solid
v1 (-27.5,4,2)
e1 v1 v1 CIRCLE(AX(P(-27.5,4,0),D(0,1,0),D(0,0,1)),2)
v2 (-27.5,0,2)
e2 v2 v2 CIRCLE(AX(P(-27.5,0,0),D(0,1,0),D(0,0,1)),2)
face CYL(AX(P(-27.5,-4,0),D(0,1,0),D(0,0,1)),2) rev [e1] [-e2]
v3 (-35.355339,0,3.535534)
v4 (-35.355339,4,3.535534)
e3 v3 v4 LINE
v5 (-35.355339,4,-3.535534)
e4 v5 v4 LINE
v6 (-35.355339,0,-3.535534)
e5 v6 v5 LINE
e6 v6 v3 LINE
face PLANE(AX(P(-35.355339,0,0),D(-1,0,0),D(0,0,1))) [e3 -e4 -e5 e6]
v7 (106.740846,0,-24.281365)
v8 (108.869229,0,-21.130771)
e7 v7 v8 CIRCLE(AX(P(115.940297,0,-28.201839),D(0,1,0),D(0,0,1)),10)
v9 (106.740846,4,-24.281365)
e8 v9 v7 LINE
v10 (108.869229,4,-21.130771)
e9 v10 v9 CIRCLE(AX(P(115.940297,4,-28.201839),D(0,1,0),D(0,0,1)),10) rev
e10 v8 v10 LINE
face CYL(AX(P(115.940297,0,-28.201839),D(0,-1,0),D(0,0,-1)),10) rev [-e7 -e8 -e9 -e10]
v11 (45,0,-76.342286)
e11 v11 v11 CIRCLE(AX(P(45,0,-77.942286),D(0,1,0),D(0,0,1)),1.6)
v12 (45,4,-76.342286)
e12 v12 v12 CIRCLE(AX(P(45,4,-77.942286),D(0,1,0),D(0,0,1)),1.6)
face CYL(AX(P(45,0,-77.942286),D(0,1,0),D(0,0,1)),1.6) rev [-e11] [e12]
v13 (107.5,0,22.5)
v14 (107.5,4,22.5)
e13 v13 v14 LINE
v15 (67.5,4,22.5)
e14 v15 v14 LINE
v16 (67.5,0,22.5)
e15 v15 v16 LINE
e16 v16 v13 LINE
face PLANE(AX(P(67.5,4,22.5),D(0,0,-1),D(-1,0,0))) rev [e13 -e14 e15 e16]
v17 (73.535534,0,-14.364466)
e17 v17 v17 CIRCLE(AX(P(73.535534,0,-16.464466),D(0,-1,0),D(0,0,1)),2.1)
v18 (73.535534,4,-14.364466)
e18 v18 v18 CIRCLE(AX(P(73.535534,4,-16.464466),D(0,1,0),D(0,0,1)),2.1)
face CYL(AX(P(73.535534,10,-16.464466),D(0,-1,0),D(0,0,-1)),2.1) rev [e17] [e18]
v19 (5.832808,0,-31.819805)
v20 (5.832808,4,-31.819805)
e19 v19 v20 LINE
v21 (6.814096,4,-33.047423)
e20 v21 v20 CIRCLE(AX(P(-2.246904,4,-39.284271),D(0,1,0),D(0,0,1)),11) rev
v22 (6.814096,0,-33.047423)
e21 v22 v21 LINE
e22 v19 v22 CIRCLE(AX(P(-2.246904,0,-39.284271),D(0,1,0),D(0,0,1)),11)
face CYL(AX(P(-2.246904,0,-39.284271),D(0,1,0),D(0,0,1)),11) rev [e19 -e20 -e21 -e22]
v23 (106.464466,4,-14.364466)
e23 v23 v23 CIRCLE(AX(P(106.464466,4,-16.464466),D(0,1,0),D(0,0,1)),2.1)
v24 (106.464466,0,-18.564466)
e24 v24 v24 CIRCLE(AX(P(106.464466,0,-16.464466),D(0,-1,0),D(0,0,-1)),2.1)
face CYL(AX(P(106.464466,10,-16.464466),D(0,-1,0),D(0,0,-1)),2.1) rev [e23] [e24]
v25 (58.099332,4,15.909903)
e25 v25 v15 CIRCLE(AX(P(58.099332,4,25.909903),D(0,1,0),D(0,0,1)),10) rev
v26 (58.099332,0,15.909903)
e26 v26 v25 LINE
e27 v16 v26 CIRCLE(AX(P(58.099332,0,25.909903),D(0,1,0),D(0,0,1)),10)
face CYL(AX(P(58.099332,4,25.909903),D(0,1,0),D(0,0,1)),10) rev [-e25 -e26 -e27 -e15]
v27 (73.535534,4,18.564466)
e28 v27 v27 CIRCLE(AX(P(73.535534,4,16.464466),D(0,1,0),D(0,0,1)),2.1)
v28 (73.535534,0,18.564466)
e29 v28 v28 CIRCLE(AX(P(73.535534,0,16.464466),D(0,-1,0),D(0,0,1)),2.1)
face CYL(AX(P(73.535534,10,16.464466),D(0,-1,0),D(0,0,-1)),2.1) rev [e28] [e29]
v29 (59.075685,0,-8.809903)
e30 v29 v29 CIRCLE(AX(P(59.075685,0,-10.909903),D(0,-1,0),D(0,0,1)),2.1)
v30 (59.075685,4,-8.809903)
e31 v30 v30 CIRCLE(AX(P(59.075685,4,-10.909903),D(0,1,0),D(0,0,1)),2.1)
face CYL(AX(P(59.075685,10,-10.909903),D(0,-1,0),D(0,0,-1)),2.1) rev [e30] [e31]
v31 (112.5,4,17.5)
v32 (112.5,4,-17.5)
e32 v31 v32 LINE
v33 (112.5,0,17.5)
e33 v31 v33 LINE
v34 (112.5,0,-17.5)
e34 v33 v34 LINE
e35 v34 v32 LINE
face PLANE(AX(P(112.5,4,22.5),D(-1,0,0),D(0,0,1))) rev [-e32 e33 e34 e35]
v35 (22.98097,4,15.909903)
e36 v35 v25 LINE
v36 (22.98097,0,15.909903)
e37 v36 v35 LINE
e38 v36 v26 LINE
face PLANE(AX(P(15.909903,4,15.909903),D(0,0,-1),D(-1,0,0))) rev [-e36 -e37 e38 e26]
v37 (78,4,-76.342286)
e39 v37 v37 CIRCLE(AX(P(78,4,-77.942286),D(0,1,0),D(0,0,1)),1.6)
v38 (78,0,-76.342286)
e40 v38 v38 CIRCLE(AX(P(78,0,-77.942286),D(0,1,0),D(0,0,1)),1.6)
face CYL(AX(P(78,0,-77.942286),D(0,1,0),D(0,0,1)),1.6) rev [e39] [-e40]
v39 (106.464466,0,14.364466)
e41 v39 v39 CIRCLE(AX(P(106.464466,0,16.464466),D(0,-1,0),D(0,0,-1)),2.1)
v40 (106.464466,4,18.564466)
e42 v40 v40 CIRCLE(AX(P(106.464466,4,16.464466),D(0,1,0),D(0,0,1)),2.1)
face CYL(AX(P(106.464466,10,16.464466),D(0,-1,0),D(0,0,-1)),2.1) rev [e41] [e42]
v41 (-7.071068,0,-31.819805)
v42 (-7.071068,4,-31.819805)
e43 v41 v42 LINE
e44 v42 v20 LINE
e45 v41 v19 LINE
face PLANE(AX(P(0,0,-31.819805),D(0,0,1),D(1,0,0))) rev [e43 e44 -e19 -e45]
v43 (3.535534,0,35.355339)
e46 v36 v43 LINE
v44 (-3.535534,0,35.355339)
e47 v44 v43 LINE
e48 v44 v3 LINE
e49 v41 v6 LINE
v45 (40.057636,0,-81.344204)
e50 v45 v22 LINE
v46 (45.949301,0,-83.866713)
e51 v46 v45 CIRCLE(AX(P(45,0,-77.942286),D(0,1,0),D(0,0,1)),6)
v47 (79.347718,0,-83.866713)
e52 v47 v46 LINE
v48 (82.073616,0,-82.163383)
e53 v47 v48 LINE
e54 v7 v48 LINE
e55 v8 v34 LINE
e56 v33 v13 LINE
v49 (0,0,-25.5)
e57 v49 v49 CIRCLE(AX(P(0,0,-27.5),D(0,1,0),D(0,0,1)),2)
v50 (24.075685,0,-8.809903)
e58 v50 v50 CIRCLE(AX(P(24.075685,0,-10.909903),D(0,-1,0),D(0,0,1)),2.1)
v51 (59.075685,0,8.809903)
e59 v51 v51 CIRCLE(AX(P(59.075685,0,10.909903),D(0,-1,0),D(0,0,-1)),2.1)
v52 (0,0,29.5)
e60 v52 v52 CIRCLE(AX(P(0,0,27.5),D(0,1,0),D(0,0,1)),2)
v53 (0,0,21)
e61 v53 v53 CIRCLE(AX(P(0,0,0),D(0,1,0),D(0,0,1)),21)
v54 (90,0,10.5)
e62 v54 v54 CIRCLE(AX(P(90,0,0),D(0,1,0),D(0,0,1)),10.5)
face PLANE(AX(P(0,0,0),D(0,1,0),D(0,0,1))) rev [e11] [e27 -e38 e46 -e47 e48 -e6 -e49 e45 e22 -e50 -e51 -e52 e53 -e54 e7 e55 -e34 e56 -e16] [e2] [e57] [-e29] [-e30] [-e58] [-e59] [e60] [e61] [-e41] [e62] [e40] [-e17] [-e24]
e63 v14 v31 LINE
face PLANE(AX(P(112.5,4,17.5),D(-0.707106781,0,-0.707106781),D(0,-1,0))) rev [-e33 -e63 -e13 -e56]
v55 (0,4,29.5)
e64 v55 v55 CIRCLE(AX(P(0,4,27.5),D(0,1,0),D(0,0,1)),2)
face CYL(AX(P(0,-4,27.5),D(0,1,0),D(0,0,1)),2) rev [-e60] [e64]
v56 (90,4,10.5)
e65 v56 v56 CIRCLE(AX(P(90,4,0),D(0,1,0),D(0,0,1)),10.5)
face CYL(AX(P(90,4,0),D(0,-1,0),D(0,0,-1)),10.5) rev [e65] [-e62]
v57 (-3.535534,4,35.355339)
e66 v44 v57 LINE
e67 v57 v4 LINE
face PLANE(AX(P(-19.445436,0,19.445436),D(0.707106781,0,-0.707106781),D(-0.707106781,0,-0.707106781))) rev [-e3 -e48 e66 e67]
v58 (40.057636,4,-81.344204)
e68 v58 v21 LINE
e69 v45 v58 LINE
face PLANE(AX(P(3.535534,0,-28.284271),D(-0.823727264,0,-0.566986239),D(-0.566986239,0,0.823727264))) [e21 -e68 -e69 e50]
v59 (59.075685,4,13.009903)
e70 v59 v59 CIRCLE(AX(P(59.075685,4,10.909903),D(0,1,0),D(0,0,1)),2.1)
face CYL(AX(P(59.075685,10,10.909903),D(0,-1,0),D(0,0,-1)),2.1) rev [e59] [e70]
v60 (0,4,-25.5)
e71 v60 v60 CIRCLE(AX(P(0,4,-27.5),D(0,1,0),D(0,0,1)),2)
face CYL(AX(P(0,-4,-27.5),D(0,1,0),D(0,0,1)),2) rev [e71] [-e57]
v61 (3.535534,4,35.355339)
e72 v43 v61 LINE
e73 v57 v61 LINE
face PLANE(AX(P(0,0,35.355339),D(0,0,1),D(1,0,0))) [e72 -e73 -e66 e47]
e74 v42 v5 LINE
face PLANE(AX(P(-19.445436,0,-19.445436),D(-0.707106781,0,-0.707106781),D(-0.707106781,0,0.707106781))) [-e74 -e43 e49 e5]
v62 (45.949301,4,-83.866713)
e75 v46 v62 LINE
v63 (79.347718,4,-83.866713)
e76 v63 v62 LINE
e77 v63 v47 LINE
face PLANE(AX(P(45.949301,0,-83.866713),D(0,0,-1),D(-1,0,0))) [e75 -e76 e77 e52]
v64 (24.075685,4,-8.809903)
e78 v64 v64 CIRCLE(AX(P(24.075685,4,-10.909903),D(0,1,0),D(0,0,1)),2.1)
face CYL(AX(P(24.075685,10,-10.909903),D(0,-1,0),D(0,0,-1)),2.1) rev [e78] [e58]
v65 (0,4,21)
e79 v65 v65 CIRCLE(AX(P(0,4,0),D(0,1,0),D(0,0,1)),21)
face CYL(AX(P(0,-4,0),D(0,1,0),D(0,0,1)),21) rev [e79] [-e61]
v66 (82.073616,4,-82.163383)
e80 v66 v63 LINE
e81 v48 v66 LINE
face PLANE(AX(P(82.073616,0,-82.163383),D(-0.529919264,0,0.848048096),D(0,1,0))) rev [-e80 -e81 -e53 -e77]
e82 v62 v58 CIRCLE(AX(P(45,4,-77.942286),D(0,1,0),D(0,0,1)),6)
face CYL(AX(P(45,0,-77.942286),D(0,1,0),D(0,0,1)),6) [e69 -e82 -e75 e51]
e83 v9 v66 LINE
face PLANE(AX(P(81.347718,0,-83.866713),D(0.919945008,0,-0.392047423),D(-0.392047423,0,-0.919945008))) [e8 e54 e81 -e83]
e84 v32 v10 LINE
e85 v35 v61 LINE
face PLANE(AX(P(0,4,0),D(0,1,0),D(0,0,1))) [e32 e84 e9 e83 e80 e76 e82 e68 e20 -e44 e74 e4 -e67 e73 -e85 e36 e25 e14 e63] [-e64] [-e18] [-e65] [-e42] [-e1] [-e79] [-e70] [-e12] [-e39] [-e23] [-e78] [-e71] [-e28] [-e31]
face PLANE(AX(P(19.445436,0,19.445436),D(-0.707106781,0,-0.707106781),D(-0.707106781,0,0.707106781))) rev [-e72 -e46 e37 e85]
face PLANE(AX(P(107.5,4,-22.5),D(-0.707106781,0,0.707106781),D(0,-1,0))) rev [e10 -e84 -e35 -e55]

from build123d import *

# Parameters (mm, degrees)
SKETCH_1_R          = 2.1
SKETCH_1_R_2        = 10.5
SKETCH_1_R_3        = 10
EXTRUDE_1_DEPTH     = 4
CHAMFER_1_SIZE      = 5
FILLET_1_R          = 10
SKETCH_2_R          = 2.1
CUT_EXTRUDE_1_DEPTH = 10
EXTRUDE_START       = -4
SKETCH_3_R          = 1.6
EXTRUDE_2_DEPTH     = 4
FILLET_2_R          = 3
FILLET_3_R          = 11
SKETCH_4_R          = 1.6
EXTRUDE_3_DEPTH     = 4
FILLET_4_R          = 10
CHAMFER_2_SIZE      = 2
CHAMFER_2_SIZE2     = 1.851556395
FILLET_5_R          = 10
SKETCH_5_R          = 17.5
CUT_EXTRUDE_2_DEPTH = 10
SKETCH_7_R          = 2.1
EXTRUDE_9_DEPTH     = 4
EXTRUDE_10_DEPTH    = 8
EXTRUDE_11_DEPTH    = 4


with BuildPart() as part:
    # 草图1 → 凸台-拉伸1 (new body)
    with BuildSketch(Plane(origin=(0, 0, 0), x_dir=(1, 0, 0), z_dir=(0, 1, 0))):
        Polygon((0, 31.819805153), (-31.819805153, 0), (0, -31.819805153), (15.909902577, -15.909902577), (67.5, -15.909902577), (67.5, -22.5), (112.5, -22.5), (112.5, 22.5), (67.5, 22.5), (67.5, 15.909902577), (15.909902577, 15.909902577), align=None)
        with Locations(Location((0, 14, 0), (0, 0, 270))):
            Circle(SKETCH_1_R, mode=Mode.SUBTRACT)
        with Locations(Location((14, 0, 0), (0, 0, 270))):
            Circle(SKETCH_1_R, mode=Mode.SUBTRACT)
        with Locations(Location((0, -14, 0), (0, 0, 270))):
            Circle(SKETCH_1_R, mode=Mode.SUBTRACT)
        with Locations(Location((-14, 0, 0), (0, 0, 270))):
            Circle(SKETCH_1_R, mode=Mode.SUBTRACT)
        with Locations(Location((90, 0, 0), (0, 0, 270))):
            Circle(SKETCH_1_R_2, mode=Mode.SUBTRACT)
        with Locations(Location((0, 22.5, 0), (0, 0, 270))):
            Circle(SKETCH_1_R, mode=Mode.SUBTRACT)
        with Locations(Location((0, -22.5, 0), (0, 0, 270))):
            Circle(SKETCH_1_R, mode=Mode.SUBTRACT)
        with Locations(Location((0, 0, 0), (0, 0, 270))):
            Circle(SKETCH_1_R_3, mode=Mode.SUBTRACT)
        with Locations(Location((-22.5, 0, 0), (0, 0, 270))):
            Circle(SKETCH_1_R, mode=Mode.SUBTRACT)
    extrude(amount=EXTRUDE_1_DEPTH)

    # 倒角1
    chamfer_1_edges = [part.edges().sort_by_distance(p)[0] for p in [
        (112.5, 2, -22.5),
        (112.5, 2, 22.5),
        (0, 2, 31.819805153),
        (-31.819805153, 2, 0),
        (0, 2, -31.819805153),
    ]]
    chamfer(chamfer_1_edges, length=CHAMFER_1_SIZE)

    # 圆角1
    # the kernel refuses this fillet: 10 mm, written as the material it adds along each edge
    with BuildSketch(Plane(origin=(15.909902577, 0, -15.909902577), x_dir=(-0.707106781186552, 0, -0.707106781186543), z_dir=(0, 1, 0))) as fillet_1_piece_1:
        with BuildLine():
            CenterArc((FILLET_1_R * 0.414213562373, -FILLET_1_R), FILLET_1_R, 90, 45)
            Line((-FILLET_1_R * 0.292893218813, -FILLET_1_R * 0.292893218813), (-FILLET_1_R * 0.307035354437, -FILLET_1_R * 0.27875108319))
            Line((-FILLET_1_R * 0.307035354437, -FILLET_1_R * 0.27875108319), (-FILLET_1_R * 0.00828427124746, FILLET_1_R * 0.02))
            Line((-FILLET_1_R * 0.00828427124746, FILLET_1_R * 0.02), (FILLET_1_R * 0.414213562373, FILLET_1_R * 0.02))
            Line((FILLET_1_R * 0.414213562373, FILLET_1_R * 0.02), (FILLET_1_R * 0.414213562373, 0))
        make_face()
    extrude(amount=4)
    with BuildSketch(Plane(origin=(15.909902577, 0, 15.909902577), x_dir=(-0.7071067811865422, 0, 0.707106781186553), z_dir=(0, 1, 0))) as fillet_1_piece_2:
        with BuildLine():
            CenterArc((FILLET_1_R * 0.414213562373, FILLET_1_R), FILLET_1_R, 225, 45)
            Line((-FILLET_1_R * 0.292893218813, FILLET_1_R * 0.292893218813), (-FILLET_1_R * 0.307035354437, FILLET_1_R * 0.27875108319))
            Line((-FILLET_1_R * 0.307035354437, FILLET_1_R * 0.27875108319), (-FILLET_1_R * 0.00828427124746, -FILLET_1_R * 0.02))
            Line((-FILLET_1_R * 0.00828427124746, -FILLET_1_R * 0.02), (FILLET_1_R * 0.414213562373, -FILLET_1_R * 0.02))
            Line((FILLET_1_R * 0.414213562373, -FILLET_1_R * 0.02), (FILLET_1_R * 0.414213562373, 0))
        make_face()
    extrude(amount=4)
    with BuildSketch(Plane(origin=(67.5, 0, 15.909902577), x_dir=(-1, 0, 0), z_dir=(0, 1, 0))) as fillet_1_piece_3:
        with BuildLine():
            CenterArc((9.400668296, 10), FILLET_1_R, 199.937217397, 70.062782603)
            Line((0, 6.590097423), (-0.188013366, 6.521899372))
            ThreePointArc((-0.188013366, 6.521899372), (-0.2, 3.295048712), (-0.2, 0))
            Line((-0.2, 0), (0, -0.2))
            Line((0, -0.2), (9.400668296, -0.2))
            Line((9.400668296, -0.2), (9.400668296, 0))
        make_face()
    extrude(amount=4)
    with BuildSketch(Plane(origin=(67.5, 0, -15.909902577), x_dir=(-1, 0, 0), z_dir=(0, 1, 0))) as fillet_1_piece_4:
        with BuildLine():
            CenterArc((9.400668296, -10), FILLET_1_R, 90, 70.062782603)
            Line((0, -6.590097423), (-0.188013366, -6.521899372))
            ThreePointArc((-0.188013366, -6.521899372), (-0.2, -3.295048712), (-0.2, 0))
            Line((-0.2, 0), (0, 0.2))
            Line((0, 0.2), (9.400668296, 0.2))
            Line((9.400668296, 0.2), (9.400668296, 0))
        make_face()
    extrude(amount=4)

    # 草图2 → 切除-拉伸1 (cut)
    with BuildSketch(Plane.XZ):
        with Locations(Location((106.464466094, 16.464466094, 0), (0, 0, 270))):
            Circle(SKETCH_2_R)
        with Locations(Location((106.464466094, -16.464466094, 0), (0, 0, 270))):
            Circle(SKETCH_2_R)
        with Locations(Location((73.535533906, -16.464466094, 0), (0, 0, 90))):
            Circle(SKETCH_2_R)
        with Locations(Location((73.535533906, 16.464466094, 0), (0, 0, 90))):
            Circle(SKETCH_2_R)
        with Locations(Location((24.075684952, 10.909902577, 0), (0, 0, 270))):
            Circle(SKETCH_2_R)
        with Locations(Location((59.075684952, 10.909902577, 0), (0, 0, 270))):
            Circle(SKETCH_2_R)
        with Locations(Location((59.075684952, -10.909902577, 0), (0, 0, 90))):
            Circle(SKETCH_2_R)
        with Locations(Location((24.075684952, -10.909902577, 0), (0, 0, 90))):
            Circle(SKETCH_2_R)
    extrude(amount=-CUT_EXTRUDE_1_DEPTH, mode=Mode.SUBTRACT)

    # 草图3 → 凸台-拉伸2 (add)
    with BuildSketch(Plane(origin=(0, 4, 0), x_dir=(1, 0, 0), z_dir=(0, 1, 0)).offset(EXTRUDE_START)):
        with BuildLine():
            Line((3.535533906, 28.284271247), (40.057636417, 81.344203773))
            ThreePointArc((40.057636417, 81.344203773), (45.94930127, 83.86671265), (50.75784592, 79.629654221))
            Line((50.75784592, 79.629654221), (67.5, 22.5))
            ThreePointArc((67.5, 22.5), (63.839583189, 17.721525883), (58.099331704, 15.909902577))
            Line((58.099331704, 15.909902577), (20.0520382, 15.909902577))
            ThreePointArc((20.0520382, 15.909902577), (16.225203877, 16.671107252), (12.980970389, 18.838834765))
            Line((12.980970389, 18.838834765), (3.535533906, 28.284271247))
        make_face()
        with Locations(Location((45, 77.942286341, 0), (0, 0, 270))):
            Circle(SKETCH_3_R, mode=Mode.SUBTRACT)
        Polygon((16.491758356, 29.470182421), (43.526560522, 68.746803428), (56.080145943, 25.909902577), (20.0520382, 25.909902577), align=None, mode=Mode.SUBTRACT)
    extrude(amount=EXTRUDE_2_DEPTH)

    # 圆角2
    fillet_2_edges = [part.edges().sort_by_distance(p)[0] for p in [
        (16.491758356, 2, -29.470182421),
        (43.526560522, 2, -68.746803428),
        (56.080145943, 2, -25.909902577),
        (20.0520382, 2, -25.909902577),
    ]]
    fillet(fillet_2_edges, radius=FILLET_2_R)

    # 圆角3
    fillet_3_edges = [part.edges().sort_by_distance(p)[0] for p in [
        (67.5, 2, -22.5),
        (3.535533906, 2, -28.284271247),
    ]]
    fillet(fillet_3_edges, radius=FILLET_3_R)

    # 草图4 → 凸台-拉伸3 (add)
    with BuildSketch(Plane(origin=(0, 4, 0), x_dir=(1, 0, 0), z_dir=(0, 1, 0)).offset(EXTRUDE_START)):
        with BuildLine():
            Line((45.94930127, 83.86671265), (81.347717681, 83.86671265))
            Line((81.347717681, 83.86671265), (107.5, 22.5))
            Line((107.5, 22.5), (97.716806526, 22.5))
            Line((97.716806526, 22.5), (75.4, 74.86671265))
            Line((75.4, 74.86671265), (52.153651701, 74.86671265))
            Line((52.153651701, 74.86671265), (50.75784592, 79.629654221))
            ThreePointArc((50.75784592, 79.629654221), (48.966689034, 82.443994695), (45.94930127, 83.86671265))
        make_face()
        with Locations(Location((78, 77.942286341, 0), (0, 0, 270))):
            Circle(SKETCH_4_R, mode=Mode.SUBTRACT)
    extrude(amount=EXTRUDE_3_DEPTH)

    # 圆角4
    fillet_4_edges = [part.edges().sort_by_distance(p)[0] for p in [
        (97.716806526, 2, -22.5),
        (75.4, 2, -74.86671265),
        (52.153651701, 2, -74.86671265),
    ]]
    fillet(fillet_4_edges, radius=FILLET_4_R)

    # 倒角2
    chamfer_2_edges = [part.edges().sort_by_distance(p)[0] for p in [
        (81.347717681, 2, -83.86671265),
    ]]
    chamfer_2_side = [part.faces().sort_by_distance(p)[0] for p in [
        (63.648509476, 2, -83.86671265),
    ]]
    chamfer(chamfer_2_edges, length=CHAMFER_2_SIZE, length2=CHAMFER_2_SIZE2, reference=chamfer_2_side[0])

    # 圆角5
    fillet_5_edges = [part.edges().sort_by_distance(p)[0] for p in [
        (107.5, 2, -22.5),
    ]]
    fillet(fillet_5_edges, radius=FILLET_5_R)

    # 草图5 → 切除-拉伸2 (cut)
    with BuildSketch(Plane(origin=(0, 4, 0), x_dir=(1, 0, 0), z_dir=(0, 1, 0))):
        with Locations(Location((0, 0, 0), (0, 0, 270))):
            Circle(SKETCH_5_R)
    extrude(amount=-CUT_EXTRUDE_2_DEPTH, mode=Mode.SUBTRACT)

    # 草图7 → 凸台-拉伸9 (add)
    with BuildSketch(Plane(origin=(0, 4, 0), x_dir=(1, 0, 0), z_dir=(0, 1, 0)).offset(EXTRUDE_START)):
        with BuildLine():
            ThreePointArc((20.0520382, -15.909902577), (16.225203877, -16.671107252), (12.980970389, -18.838834765))
            Line((12.980970389, -18.838834765), (3.535533906, -28.284271247))
            Line((3.535533906, -28.284271247), (-3.535533906, -28.284271247))
            Line((-3.535533906, -28.284271247), (-28.284271247, -3.535533906))
            Line((-28.284271247, -3.535533906), (-28.284271247, 3.535533906))
            Line((-28.284271247, 3.535533906), (-3.535533906, 28.284271247))
            Line((-3.535533906, 28.284271247), (-2.246903538, 28.284271247))
            ThreePointArc((-2.246903538, 28.284271247), (2.162794465, 29.20684283), (5.832808457, 31.819805153))
            Line((5.832808457, 31.819805153), (-7.071067812, 31.819805153))
            Line((-7.071067812, 31.819805153), (-35.355339059, 3.535533906))
            Line((-35.355339059, 3.535533906), (-35.355339059, -3.535533906))
            Line((-35.355339059, -3.535533906), (-3.535533906, -35.355339059))
            Line((-3.535533906, -35.355339059), (3.535533906, -35.355339059))
            Line((3.535533906, -35.355339059), (22.980970389, -15.909902577))
            Line((22.980970389, -15.909902577), (20.0520382, -15.909902577))
        make_face()
        with Locations((0, -22.5)):
            Circle(SKETCH_7_R)
        with Locations((0, 22.5)):
            Circle(SKETCH_7_R)
        with Locations((-22.5, 0)):
            Circle(SKETCH_7_R)
        with Locations((24.075684952, -10.909902577)):
            Circle(SKETCH_7_R)
    extrude(amount=EXTRUDE_9_DEPTH)


with BuildPart() as body_2:
    # 草图9 → 凸台-拉伸10 (new body)
    with BuildSketch(Plane(origin=(0, 4, 0), x_dir=(1, 0, 0), z_dir=(0, 1, 0))):
        with BuildLine():
            ThreePointArc((2, 27.5), (1.414213562, 28.914213562), (0, 29.5))
            Line((0, 29.5), (0, 25.5))
            ThreePointArc((0, 25.5), (1.414213562, 26.085786438), (2, 27.5))
        make_face()
        with BuildLine():
            Line((0, 25.5), (0, 29.5))
            ThreePointArc((0, 29.5), (-2, 27.5), (0, 25.5))
        make_face()
        with BuildLine():
            ThreePointArc((21, 0), (14.849242405, 14.849242405), (0, 21))
            Line((0, 21), (0, 17.5))
            ThreePointArc((0, 17.5), (12.374368671, 12.374368671), (17.5, 0))
            ThreePointArc((17.5, 0), (12.374368671, -12.374368671), (0, -17.5))
            Line((0, -17.5), (0, -21))
            ThreePointArc((0, -21), (14.849242405, -14.849242405), (21, 0))
        make_face()
        with BuildLine():
            Line((0, 17.5), (0, 21))
            ThreePointArc((0, 21), (-14.849242405, 14.849242405), (-21, 0))
            Line((-21, 0), (-17.5, 0))
            ThreePointArc((-17.5, 0), (-12.374368671, 12.374368671), (0, 17.5))
        make_face()
        with BuildLine():
            Line((-17.5, 0), (-21, 0))
            ThreePointArc((-21, 0), (-14.849242405, -14.849242405), (0, -21))
            Line((0, -21), (0, -17.5))
            ThreePointArc((0, -17.5), (-12.374368671, -12.374368671), (-17.5, 0))
        make_face()
        with BuildLine():
            Line((0, 0), (0, 17.5))
            ThreePointArc((0, 17.5), (-12.374368671, 12.374368671), (-17.5, 0))
            Line((-17.5, 0), (0, 0))
        make_face()
        with BuildLine():
            Line((0, -17.5), (0, 0))
            Line((0, 0), (-17.5, 0))
            ThreePointArc((-17.5, 0), (-12.374368671, -12.374368671), (0, -17.5))
        make_face()
        with BuildLine():
            ThreePointArc((17.5, 0), (12.374368671, 12.374368671), (0, 17.5))
            Line((0, 17.5), (0, 0))
            Line((0, 0), (0, -17.5))
            ThreePointArc((0, -17.5), (12.374368671, -12.374368671), (17.5, 0))
        make_face()
        with BuildLine():
            ThreePointArc((-29.5, 0), (-27.5, -2), (-25.5, 0))
            Line((-25.5, 0), (-29.5, 0))
        make_face()
        with BuildLine():
            Line((-29.5, 0), (-25.5, 0))
            ThreePointArc((-25.5, 0), (-27.5, 2), (-29.5, 0))
        make_face()
        with BuildLine():
            ThreePointArc((2, -27.5), (1.414213562, -26.085786438), (0, -25.5))
            Line((0, -25.5), (0, -29.5))
            ThreePointArc((0, -29.5), (1.414213562, -28.914213562), (2, -27.5))
        make_face()
        with BuildLine():
            Line((0, -29.5), (0, -25.5))
            ThreePointArc((0, -25.5), (-2, -27.5), (0, -29.5))
        make_face()
    extrude(amount=-EXTRUDE_10_DEPTH)


with BuildPart() as part_1:
    add(part.part)

    # Combine 1: cut body 2
    add(body_2.part, mode=Mode.SUBTRACT)

    # 草图10 → 凸台-拉伸11 (add)
    with BuildSketch(Plane(origin=(0, 4, 0), x_dir=(1, 0, 0), z_dir=(0, 1, 0))):
        Polygon((64.860362007, 78.786003649), (37.290552299, 66.389765699), (10.816007298, 26.699675726), (34.20335455, 14.425182396), (66.604419696, 20.562429061), (97.537214988, 20.562429061), (99.113349063, 32.87889421), (78.415005872, 73.577223442), align=None)
    extrude(amount=-EXTRUDE_11_DEPTH)


solid = part_1.part
